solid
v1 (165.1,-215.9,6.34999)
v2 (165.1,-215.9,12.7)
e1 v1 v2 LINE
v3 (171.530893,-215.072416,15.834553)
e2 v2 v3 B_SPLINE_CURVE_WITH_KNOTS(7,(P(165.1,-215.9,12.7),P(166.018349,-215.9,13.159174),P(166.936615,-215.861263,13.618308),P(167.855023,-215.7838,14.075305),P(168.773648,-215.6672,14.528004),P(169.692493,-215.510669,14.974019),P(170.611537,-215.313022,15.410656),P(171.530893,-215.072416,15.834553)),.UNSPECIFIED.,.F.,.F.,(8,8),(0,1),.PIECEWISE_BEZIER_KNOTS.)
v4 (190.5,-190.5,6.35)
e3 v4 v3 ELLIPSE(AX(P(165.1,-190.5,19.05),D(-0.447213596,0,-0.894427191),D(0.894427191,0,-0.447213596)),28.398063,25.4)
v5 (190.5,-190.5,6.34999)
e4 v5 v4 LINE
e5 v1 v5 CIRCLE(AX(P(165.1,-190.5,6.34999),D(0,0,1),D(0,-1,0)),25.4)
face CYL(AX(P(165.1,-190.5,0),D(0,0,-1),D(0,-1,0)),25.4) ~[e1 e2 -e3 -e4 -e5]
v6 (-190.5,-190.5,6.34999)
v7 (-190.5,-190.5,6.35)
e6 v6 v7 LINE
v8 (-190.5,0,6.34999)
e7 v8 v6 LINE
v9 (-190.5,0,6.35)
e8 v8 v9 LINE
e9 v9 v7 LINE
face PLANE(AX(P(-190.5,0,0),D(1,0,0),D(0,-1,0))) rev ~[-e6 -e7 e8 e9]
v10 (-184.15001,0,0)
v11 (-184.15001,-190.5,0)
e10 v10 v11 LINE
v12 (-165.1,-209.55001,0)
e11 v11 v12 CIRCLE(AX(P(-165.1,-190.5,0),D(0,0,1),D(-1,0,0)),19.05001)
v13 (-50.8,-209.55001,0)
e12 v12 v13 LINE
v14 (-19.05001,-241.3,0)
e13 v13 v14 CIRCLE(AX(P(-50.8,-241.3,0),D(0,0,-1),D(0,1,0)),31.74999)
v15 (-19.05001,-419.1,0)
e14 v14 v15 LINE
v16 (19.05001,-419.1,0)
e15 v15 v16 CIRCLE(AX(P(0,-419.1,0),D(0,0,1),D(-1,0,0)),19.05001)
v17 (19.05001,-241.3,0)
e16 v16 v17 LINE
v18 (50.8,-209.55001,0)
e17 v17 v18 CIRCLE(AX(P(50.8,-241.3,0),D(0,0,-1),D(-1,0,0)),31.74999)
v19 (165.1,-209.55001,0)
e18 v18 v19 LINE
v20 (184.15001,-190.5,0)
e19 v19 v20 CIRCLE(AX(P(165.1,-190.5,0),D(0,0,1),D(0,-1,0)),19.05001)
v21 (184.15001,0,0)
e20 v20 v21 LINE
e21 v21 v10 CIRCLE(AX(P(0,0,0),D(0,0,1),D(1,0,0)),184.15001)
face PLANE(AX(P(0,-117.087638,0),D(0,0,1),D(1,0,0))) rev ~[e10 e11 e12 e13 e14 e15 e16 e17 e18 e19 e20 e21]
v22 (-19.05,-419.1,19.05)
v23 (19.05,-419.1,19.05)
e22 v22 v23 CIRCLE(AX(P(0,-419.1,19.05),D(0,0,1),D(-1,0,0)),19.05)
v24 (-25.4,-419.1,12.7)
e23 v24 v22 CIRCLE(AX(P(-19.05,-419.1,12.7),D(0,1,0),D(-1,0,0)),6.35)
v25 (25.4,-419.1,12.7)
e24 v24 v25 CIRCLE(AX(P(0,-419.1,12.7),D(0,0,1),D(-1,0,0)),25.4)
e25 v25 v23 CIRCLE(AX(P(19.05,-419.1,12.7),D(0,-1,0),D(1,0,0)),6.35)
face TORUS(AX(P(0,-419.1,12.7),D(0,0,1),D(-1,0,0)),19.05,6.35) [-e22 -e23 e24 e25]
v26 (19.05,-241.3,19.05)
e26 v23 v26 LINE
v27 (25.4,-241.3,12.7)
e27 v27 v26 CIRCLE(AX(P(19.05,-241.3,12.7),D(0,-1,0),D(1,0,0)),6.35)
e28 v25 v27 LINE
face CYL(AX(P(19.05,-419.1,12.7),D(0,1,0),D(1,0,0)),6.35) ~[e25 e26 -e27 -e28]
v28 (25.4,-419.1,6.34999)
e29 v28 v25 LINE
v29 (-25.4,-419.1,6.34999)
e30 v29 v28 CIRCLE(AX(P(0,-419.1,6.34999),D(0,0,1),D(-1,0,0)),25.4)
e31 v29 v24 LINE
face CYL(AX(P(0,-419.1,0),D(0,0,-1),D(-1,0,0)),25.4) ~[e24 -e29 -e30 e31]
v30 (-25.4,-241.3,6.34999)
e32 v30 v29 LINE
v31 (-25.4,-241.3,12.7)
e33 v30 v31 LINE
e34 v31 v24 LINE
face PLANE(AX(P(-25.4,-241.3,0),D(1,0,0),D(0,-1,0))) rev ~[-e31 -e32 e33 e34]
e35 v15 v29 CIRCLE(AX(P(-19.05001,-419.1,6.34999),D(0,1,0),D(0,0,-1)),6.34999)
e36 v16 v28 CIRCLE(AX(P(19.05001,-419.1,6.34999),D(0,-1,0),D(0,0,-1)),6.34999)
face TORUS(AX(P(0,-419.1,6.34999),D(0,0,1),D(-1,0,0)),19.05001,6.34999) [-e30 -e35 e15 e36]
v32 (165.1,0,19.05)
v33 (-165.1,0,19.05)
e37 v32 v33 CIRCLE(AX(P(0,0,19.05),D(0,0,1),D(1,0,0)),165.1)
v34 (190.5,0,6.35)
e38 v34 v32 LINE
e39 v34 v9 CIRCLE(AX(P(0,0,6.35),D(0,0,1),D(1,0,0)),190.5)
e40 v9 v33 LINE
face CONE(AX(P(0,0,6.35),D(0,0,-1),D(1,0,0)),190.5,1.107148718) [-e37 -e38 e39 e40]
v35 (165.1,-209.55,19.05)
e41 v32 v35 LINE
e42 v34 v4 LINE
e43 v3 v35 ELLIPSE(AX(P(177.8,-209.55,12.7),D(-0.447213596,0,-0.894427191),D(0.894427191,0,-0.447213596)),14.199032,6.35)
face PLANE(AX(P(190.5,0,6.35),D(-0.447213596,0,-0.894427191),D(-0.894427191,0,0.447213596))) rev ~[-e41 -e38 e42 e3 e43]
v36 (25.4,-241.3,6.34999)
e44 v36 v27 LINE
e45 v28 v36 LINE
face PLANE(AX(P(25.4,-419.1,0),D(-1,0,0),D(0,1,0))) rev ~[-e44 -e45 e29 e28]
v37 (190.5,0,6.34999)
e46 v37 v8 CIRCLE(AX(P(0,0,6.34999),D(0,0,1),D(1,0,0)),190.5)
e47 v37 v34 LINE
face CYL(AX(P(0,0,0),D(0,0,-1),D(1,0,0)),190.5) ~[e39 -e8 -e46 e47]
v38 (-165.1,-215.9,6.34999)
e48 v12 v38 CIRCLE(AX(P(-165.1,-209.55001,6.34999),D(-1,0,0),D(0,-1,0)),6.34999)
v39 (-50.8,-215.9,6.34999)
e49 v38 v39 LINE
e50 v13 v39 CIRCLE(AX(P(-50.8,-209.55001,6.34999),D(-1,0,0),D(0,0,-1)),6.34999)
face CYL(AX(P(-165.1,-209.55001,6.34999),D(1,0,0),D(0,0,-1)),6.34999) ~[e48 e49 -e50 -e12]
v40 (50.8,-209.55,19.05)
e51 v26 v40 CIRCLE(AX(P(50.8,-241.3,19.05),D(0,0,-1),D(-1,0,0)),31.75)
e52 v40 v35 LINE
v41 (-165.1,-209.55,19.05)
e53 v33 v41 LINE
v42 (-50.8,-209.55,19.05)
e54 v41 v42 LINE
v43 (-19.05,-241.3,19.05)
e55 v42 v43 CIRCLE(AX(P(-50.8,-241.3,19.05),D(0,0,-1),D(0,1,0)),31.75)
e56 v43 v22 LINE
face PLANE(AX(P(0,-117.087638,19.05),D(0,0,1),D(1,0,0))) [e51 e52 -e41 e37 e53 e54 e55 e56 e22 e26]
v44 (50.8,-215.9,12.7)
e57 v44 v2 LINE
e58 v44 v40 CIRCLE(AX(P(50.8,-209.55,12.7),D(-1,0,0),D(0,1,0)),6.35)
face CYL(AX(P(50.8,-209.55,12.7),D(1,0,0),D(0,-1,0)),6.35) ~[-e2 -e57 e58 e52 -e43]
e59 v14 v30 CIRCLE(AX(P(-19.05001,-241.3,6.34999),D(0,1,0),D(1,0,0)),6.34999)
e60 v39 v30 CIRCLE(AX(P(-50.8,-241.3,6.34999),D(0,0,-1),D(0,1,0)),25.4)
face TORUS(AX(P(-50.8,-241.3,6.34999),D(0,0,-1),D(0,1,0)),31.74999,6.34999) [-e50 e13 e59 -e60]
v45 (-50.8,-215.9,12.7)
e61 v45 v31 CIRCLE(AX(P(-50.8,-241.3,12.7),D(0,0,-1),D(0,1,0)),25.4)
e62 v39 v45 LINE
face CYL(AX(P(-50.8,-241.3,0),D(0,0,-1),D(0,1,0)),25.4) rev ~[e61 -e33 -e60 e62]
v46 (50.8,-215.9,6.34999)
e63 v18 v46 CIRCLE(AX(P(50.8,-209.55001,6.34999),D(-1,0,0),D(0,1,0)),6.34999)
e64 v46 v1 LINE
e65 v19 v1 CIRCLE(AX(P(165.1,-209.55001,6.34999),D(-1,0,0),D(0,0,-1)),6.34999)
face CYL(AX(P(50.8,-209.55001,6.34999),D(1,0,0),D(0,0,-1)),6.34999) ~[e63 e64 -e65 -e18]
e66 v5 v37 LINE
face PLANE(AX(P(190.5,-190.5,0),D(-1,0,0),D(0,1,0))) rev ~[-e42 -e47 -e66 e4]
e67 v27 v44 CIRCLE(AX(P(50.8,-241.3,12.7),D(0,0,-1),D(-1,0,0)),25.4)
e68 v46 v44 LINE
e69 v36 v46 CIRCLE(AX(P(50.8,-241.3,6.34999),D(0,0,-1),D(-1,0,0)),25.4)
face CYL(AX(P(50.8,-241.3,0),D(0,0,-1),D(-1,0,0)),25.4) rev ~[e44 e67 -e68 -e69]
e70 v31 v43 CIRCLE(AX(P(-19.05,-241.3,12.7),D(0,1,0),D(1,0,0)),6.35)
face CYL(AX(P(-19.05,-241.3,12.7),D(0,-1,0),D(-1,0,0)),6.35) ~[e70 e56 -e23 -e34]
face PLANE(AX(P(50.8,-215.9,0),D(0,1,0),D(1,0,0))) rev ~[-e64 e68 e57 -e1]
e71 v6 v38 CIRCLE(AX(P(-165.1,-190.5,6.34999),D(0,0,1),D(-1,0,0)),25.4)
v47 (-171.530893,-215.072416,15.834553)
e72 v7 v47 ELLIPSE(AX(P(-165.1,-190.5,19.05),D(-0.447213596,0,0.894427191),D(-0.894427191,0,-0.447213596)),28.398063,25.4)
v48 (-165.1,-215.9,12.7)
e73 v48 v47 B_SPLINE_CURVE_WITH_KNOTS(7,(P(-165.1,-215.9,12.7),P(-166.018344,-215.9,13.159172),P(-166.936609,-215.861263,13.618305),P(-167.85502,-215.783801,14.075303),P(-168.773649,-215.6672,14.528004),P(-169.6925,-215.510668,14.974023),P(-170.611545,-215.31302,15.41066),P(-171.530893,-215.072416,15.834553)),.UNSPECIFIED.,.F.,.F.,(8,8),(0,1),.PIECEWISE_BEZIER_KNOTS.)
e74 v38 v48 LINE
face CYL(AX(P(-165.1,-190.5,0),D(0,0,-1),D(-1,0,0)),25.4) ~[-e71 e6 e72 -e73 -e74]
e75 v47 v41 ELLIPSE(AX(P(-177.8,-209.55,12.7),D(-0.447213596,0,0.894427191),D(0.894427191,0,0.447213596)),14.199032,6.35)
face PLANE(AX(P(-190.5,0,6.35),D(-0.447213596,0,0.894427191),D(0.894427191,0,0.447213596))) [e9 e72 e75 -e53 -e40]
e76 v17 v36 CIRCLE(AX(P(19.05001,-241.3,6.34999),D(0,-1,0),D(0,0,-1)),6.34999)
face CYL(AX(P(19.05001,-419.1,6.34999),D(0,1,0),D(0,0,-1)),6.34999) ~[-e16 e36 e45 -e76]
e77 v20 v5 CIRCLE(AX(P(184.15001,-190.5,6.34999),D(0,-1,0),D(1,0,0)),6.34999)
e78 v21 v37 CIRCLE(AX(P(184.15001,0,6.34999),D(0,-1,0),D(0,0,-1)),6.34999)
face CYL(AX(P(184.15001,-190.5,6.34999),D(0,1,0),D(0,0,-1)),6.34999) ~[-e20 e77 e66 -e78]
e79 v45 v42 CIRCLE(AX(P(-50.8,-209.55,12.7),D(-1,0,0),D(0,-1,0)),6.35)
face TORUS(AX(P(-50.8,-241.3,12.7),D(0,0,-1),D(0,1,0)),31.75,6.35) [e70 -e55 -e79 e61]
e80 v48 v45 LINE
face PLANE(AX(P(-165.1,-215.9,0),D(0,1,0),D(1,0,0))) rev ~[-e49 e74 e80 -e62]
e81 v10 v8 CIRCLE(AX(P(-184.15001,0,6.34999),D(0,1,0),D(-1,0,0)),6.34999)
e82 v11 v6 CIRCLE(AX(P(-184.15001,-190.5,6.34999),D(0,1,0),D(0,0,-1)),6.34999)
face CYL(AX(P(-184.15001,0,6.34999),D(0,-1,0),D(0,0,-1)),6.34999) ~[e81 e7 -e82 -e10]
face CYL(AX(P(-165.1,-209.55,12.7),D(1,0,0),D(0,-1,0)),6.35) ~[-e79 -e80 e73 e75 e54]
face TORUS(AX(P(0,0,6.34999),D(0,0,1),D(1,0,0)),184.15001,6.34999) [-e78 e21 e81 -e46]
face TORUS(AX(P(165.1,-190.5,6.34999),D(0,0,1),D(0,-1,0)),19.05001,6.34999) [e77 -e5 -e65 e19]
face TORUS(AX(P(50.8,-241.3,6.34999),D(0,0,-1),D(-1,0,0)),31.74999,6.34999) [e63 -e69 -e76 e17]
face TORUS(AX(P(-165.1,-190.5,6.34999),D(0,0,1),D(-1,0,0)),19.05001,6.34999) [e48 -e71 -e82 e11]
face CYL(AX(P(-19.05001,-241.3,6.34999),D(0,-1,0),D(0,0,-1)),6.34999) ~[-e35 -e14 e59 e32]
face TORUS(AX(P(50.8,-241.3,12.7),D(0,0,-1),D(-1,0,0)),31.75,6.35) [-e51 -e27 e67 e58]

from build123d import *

# Parameters (mm, degrees)
F1_DEPTH    = 19.05
F2_T1_DEPTH = 256.2816533942
F2_T4_ANGLE = 180
F3_R        = 6.35
F4_R        = 6.34999


# Not quite as in the source:
# - a fillet or chamfer that OpenCascade refuses, or shapes differently, is made with other operations: its cross-section is extruded or revolved along the edge and cut away or added
# - a fillet or chamfer is up to 0.001 mm smaller than in the source, because OpenCascade refuses the exact size


with BuildPart() as f1:
    # F0 (on Top) → F1 (new body)
    with BuildSketch(Plane.XY):
        with BuildLine():
            Line((190.5, -190.5), (190.5, 0))
            ThreePointArc((190.5, 0), (0, 190.5), (-190.5, 0))
            Line((-190.5, 0), (-190.5, -190.5))
            ThreePointArc((-190.5, -190.5), (-183.0605122421, -208.4605122421), (-165.1, -215.9))
            Line((-165.1, -215.9), (-50.8, -215.9))
            ThreePointArc((-50.8, -215.9), (-32.8394877579, -223.3394877579), (-25.4, -241.3))
            Line((-25.4, -241.3), (-25.4, -419.1))
            ThreePointArc((-25.4, -419.1), (0, -444.5), (25.4, -419.1))
            Line((25.4, -419.1), (25.4, -241.3))
            ThreePointArc((25.4, -241.3), (32.8394877579, -223.3394877579), (50.8, -215.9))
            Line((50.8, -215.9), (165.1, -215.9))
            ThreePointArc((165.1, -215.9), (183.0605122421, -208.4605122421), (190.5, -190.5))
        make_face()
    extrude(amount=F1_DEPTH)

    # F2: chamfer of 12.7 x 25.4 on 3 edges, made by hand

    # F2_s2 → F2_t1 (cut)
    with BuildSketch(Plane.XZ):
        Polygon((-190.5, 6.35), (-165.1, 19.05), (-190.5, 19.05), align=None)
        Polygon((190.5, 6.35), (165.1, 19.05), (190.5, 19.05), align=None)
    extrude(amount=F2_T1_DEPTH, mode=Mode.SUBTRACT)

    # F2_s3 → F2_t4 (revolve, cut)
    with BuildSketch(Plane.XZ):
        Polygon((190.5, 6.35), (165.1, 19.05), (190.5, 19.05), align=None)
    revolve(axis=Axis((0, 0, 19.05), (0, 0, 1)), revolution_arc=F2_T4_ANGLE, mode=Mode.SUBTRACT)

    # F3
    f3_edges = [f1.edges().sort_by_distance(p)[0] for p in [
        (0, -444.5, 19.05),
    ]]
    fillet(f3_edges, radius=F3_R)

    # F4 (radius 6.35 in the source; OpenCascade refuses exactly that, so slightly less here)
    f4_edges = [f1.edges().sort_by_distance(p)[0] for p in [
        (25.4, -330.2, 0),
        (32.839488, -223.339488, 0),
        (107.95, -215.9, 0),
        (183.060512, -208.460512, 0),
        (190.5, -95.25, 0),
        (0, 190.5, 0),
        (-190.5, -95.25, 0),
        (-183.060512, -208.460512, 0),
        (-107.95, -215.9, 0),
        (-32.839488, -223.339488, 0),
        (-25.4, -330.2, 0),
        (0, -444.5, 0),
    ]]
    fillet(f4_edges, radius=F4_R)


solid = f1.part
